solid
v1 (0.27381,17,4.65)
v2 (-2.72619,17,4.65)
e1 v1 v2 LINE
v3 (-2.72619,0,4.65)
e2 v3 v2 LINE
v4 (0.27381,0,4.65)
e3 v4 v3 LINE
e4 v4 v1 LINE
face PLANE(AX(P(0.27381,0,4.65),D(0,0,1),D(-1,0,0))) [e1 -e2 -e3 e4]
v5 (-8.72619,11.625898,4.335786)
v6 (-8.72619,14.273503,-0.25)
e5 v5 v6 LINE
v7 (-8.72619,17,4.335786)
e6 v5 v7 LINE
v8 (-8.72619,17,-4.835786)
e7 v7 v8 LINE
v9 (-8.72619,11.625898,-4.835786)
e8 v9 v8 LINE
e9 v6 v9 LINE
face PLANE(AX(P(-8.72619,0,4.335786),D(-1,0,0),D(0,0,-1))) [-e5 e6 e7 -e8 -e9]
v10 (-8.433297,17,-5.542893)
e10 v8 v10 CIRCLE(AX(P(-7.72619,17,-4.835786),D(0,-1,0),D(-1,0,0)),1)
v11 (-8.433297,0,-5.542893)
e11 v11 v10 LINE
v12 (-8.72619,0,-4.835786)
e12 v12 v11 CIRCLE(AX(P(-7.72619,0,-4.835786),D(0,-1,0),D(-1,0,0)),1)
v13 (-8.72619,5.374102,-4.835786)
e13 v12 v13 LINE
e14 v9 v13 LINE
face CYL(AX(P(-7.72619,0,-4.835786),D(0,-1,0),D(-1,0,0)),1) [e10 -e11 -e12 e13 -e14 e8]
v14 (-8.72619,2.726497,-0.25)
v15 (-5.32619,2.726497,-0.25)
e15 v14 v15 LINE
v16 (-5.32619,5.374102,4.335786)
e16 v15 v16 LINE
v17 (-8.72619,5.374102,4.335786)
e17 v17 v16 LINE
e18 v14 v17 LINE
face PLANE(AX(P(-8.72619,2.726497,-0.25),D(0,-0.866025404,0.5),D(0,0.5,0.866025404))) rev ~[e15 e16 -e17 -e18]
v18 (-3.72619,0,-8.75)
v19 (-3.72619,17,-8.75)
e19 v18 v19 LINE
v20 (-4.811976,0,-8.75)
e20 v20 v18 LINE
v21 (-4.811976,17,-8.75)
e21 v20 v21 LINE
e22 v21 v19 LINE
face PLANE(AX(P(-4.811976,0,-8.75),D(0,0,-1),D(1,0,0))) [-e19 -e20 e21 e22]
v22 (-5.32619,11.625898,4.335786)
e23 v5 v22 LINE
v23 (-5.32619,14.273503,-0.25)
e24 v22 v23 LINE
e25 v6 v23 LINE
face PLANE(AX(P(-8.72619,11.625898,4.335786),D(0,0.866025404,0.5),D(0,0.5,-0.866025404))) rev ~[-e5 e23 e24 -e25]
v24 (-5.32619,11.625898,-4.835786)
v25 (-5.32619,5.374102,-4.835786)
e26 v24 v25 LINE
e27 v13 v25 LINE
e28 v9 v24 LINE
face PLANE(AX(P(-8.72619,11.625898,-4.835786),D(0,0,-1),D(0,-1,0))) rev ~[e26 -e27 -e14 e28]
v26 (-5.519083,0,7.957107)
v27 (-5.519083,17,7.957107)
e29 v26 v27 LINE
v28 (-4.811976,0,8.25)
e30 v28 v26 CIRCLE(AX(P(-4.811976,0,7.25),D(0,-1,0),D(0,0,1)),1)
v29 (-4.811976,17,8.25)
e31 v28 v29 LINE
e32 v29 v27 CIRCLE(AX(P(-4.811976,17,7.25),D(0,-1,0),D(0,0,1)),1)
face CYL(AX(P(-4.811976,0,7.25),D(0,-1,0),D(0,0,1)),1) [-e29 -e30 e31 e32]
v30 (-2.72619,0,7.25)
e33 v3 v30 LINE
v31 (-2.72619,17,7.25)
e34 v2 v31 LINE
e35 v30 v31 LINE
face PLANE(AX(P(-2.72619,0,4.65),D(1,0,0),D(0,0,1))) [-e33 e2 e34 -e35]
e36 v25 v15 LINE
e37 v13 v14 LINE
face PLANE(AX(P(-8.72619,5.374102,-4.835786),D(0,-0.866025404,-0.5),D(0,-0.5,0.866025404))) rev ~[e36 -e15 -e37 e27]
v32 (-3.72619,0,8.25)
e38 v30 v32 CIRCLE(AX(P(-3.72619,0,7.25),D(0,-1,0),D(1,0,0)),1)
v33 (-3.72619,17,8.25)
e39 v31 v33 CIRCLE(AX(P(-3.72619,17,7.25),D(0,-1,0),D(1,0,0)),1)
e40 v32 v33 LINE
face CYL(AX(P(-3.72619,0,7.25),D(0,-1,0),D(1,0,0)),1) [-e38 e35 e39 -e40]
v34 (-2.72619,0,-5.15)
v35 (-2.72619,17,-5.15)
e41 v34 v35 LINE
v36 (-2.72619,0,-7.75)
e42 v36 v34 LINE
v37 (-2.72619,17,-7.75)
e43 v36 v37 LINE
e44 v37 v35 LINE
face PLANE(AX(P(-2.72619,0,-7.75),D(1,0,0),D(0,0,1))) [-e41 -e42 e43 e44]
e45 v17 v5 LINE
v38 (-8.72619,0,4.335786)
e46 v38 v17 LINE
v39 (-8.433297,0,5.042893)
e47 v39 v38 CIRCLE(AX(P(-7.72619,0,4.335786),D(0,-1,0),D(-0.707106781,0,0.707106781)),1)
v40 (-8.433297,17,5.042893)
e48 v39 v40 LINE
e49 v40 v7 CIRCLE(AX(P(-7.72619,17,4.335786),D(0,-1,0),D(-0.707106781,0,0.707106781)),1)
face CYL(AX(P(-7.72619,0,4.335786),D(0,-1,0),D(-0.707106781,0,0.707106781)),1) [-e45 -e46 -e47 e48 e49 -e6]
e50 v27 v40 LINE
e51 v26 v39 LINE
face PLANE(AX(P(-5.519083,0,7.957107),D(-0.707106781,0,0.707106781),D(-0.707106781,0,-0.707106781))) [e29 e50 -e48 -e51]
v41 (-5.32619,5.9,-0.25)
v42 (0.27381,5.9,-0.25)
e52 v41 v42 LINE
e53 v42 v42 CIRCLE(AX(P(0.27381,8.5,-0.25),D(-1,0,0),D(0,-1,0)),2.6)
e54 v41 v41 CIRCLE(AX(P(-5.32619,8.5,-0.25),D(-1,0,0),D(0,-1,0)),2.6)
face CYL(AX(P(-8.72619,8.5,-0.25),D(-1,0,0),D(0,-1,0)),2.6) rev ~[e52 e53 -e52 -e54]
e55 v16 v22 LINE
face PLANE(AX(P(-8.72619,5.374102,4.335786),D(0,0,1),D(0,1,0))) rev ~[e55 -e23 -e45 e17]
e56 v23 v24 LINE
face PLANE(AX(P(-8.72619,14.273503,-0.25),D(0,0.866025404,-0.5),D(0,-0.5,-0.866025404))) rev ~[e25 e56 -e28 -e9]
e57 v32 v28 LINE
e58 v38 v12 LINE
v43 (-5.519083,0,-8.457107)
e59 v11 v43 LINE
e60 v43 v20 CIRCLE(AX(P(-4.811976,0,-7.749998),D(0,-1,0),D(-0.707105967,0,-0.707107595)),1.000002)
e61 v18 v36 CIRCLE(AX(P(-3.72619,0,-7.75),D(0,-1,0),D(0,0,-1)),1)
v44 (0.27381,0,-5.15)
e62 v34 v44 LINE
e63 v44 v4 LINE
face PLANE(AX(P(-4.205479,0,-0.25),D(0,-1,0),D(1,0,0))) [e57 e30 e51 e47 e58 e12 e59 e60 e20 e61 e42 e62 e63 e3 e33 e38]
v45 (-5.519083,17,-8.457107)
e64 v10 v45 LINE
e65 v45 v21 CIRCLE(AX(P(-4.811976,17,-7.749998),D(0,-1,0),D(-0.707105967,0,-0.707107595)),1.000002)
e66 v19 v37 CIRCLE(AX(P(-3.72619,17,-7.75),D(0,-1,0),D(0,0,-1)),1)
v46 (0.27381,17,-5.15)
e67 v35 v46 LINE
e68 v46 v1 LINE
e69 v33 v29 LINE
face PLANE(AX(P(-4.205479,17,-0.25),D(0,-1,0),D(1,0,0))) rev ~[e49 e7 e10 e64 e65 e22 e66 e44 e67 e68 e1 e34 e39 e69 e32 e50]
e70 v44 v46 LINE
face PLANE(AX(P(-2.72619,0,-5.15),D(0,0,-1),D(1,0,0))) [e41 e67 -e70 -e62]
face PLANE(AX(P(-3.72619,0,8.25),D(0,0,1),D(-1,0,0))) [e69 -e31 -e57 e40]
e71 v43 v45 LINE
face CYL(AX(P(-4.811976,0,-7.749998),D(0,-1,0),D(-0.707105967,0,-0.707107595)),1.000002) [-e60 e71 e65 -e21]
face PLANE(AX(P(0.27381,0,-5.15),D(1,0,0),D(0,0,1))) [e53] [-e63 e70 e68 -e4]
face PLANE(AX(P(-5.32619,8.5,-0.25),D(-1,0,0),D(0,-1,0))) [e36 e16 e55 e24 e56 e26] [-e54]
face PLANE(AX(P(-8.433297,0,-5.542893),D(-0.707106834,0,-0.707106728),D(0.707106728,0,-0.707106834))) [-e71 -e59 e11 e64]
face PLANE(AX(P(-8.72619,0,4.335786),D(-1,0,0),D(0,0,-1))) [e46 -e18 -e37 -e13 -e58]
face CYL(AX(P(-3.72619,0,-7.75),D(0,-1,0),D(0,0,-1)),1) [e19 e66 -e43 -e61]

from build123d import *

# Parameters (mm, degrees)
F1_DEPTH = 17
F2_R     = 2.6
F3_DEPTH = 3.4
F4_DEPTH = 9.001


# Not quite as in the source:
# - ends of sketch curves that miss each other by under 0.0002 mm in the source are joined


with BuildPart() as f1:
    # F0 (on Front) → F1 (new body)
    with BuildSketch(Plane.XZ):
        with BuildLine():
            ThreePointArc((-8.4332967812, 5.0428927812), (-8.6500695325, 4.7184694324), (-8.72619, 4.335786))
            Line((-8.72619, 4.335786), (-8.72619, -4.835786))
            ThreePointArc((-8.72619, -4.835786), (-8.6500695325, -5.2184694324), (-8.4332967812, -5.5428927812))
            Line((-8.4332967812, -5.5428927812), (-5.519083, -8.457107))
            ThreePointArc((-5.519083, -8.457107), (-5.1946594324, -8.6738795325), (-4.811976, -8.75))
            Line((-4.811976, -8.75), (-3.72619, -8.75))
            ThreePointArc((-3.72619, -8.75), (-3.0190832188, -8.4571067812), (-2.72619, -7.75))
            Line((-2.72619, -7.75), (-2.72619, -5.15))
            Line((-2.72619, -5.15), (0.27381, -5.15))
            Line((0.27381, -5.15), (0.27381, 4.65))
            Line((0.27381, 4.65), (-2.72619, 4.65))
            Line((-2.72619, 4.65), (-2.72619, 7.25))
            ThreePointArc((-2.72619, 7.25), (-3.0190832188, 7.9571067812), (-3.72619, 8.25))
            Line((-3.72619, 8.25), (-4.811976, 8.25))
            ThreePointArc((-4.811976, 8.25), (-5.1946594324, 8.1738795325), (-5.5190827812, 7.9571067812))
            Line((-5.5190827812, 7.9571067812), (-8.4332967812, 5.0428927812))
        make_face()
    extrude(amount=-F1_DEPTH)

    # F2 (on face) → F3 (cut)
    with BuildSketch(Plane(origin=(-8.72619, 0, 0), x_dir=(0, -1, 0), z_dir=(-1, 0, 0))):
        Polygon((-11.6258979104, -4.835786), (-5.3741020896, -4.835786), (-2.7264973081, -0.25), (-5.3741020896, 4.335786), (-11.6258979104, 4.335786), (-14.2735026919, -0.25), align=None)
        with Locations((-8.5, -0.25)):
            Circle(F2_R, mode=Mode.SUBTRACT)
        with Locations((-8.5, -0.25)):
            Circle(F2_R)
    extrude(amount=-F3_DEPTH, mode=Mode.SUBTRACT)

    # F2 (on face) → F4 (cut, through all)
    with BuildSketch(Plane(origin=(-8.72619, 0, 0), x_dir=(0, -1, 0), z_dir=(-1, 0, 0))):
        with Locations((-8.5, -0.25)):
            Circle(F2_R)
    extrude(amount=-F4_DEPTH, mode=Mode.SUBTRACT)


solid = f1.part
